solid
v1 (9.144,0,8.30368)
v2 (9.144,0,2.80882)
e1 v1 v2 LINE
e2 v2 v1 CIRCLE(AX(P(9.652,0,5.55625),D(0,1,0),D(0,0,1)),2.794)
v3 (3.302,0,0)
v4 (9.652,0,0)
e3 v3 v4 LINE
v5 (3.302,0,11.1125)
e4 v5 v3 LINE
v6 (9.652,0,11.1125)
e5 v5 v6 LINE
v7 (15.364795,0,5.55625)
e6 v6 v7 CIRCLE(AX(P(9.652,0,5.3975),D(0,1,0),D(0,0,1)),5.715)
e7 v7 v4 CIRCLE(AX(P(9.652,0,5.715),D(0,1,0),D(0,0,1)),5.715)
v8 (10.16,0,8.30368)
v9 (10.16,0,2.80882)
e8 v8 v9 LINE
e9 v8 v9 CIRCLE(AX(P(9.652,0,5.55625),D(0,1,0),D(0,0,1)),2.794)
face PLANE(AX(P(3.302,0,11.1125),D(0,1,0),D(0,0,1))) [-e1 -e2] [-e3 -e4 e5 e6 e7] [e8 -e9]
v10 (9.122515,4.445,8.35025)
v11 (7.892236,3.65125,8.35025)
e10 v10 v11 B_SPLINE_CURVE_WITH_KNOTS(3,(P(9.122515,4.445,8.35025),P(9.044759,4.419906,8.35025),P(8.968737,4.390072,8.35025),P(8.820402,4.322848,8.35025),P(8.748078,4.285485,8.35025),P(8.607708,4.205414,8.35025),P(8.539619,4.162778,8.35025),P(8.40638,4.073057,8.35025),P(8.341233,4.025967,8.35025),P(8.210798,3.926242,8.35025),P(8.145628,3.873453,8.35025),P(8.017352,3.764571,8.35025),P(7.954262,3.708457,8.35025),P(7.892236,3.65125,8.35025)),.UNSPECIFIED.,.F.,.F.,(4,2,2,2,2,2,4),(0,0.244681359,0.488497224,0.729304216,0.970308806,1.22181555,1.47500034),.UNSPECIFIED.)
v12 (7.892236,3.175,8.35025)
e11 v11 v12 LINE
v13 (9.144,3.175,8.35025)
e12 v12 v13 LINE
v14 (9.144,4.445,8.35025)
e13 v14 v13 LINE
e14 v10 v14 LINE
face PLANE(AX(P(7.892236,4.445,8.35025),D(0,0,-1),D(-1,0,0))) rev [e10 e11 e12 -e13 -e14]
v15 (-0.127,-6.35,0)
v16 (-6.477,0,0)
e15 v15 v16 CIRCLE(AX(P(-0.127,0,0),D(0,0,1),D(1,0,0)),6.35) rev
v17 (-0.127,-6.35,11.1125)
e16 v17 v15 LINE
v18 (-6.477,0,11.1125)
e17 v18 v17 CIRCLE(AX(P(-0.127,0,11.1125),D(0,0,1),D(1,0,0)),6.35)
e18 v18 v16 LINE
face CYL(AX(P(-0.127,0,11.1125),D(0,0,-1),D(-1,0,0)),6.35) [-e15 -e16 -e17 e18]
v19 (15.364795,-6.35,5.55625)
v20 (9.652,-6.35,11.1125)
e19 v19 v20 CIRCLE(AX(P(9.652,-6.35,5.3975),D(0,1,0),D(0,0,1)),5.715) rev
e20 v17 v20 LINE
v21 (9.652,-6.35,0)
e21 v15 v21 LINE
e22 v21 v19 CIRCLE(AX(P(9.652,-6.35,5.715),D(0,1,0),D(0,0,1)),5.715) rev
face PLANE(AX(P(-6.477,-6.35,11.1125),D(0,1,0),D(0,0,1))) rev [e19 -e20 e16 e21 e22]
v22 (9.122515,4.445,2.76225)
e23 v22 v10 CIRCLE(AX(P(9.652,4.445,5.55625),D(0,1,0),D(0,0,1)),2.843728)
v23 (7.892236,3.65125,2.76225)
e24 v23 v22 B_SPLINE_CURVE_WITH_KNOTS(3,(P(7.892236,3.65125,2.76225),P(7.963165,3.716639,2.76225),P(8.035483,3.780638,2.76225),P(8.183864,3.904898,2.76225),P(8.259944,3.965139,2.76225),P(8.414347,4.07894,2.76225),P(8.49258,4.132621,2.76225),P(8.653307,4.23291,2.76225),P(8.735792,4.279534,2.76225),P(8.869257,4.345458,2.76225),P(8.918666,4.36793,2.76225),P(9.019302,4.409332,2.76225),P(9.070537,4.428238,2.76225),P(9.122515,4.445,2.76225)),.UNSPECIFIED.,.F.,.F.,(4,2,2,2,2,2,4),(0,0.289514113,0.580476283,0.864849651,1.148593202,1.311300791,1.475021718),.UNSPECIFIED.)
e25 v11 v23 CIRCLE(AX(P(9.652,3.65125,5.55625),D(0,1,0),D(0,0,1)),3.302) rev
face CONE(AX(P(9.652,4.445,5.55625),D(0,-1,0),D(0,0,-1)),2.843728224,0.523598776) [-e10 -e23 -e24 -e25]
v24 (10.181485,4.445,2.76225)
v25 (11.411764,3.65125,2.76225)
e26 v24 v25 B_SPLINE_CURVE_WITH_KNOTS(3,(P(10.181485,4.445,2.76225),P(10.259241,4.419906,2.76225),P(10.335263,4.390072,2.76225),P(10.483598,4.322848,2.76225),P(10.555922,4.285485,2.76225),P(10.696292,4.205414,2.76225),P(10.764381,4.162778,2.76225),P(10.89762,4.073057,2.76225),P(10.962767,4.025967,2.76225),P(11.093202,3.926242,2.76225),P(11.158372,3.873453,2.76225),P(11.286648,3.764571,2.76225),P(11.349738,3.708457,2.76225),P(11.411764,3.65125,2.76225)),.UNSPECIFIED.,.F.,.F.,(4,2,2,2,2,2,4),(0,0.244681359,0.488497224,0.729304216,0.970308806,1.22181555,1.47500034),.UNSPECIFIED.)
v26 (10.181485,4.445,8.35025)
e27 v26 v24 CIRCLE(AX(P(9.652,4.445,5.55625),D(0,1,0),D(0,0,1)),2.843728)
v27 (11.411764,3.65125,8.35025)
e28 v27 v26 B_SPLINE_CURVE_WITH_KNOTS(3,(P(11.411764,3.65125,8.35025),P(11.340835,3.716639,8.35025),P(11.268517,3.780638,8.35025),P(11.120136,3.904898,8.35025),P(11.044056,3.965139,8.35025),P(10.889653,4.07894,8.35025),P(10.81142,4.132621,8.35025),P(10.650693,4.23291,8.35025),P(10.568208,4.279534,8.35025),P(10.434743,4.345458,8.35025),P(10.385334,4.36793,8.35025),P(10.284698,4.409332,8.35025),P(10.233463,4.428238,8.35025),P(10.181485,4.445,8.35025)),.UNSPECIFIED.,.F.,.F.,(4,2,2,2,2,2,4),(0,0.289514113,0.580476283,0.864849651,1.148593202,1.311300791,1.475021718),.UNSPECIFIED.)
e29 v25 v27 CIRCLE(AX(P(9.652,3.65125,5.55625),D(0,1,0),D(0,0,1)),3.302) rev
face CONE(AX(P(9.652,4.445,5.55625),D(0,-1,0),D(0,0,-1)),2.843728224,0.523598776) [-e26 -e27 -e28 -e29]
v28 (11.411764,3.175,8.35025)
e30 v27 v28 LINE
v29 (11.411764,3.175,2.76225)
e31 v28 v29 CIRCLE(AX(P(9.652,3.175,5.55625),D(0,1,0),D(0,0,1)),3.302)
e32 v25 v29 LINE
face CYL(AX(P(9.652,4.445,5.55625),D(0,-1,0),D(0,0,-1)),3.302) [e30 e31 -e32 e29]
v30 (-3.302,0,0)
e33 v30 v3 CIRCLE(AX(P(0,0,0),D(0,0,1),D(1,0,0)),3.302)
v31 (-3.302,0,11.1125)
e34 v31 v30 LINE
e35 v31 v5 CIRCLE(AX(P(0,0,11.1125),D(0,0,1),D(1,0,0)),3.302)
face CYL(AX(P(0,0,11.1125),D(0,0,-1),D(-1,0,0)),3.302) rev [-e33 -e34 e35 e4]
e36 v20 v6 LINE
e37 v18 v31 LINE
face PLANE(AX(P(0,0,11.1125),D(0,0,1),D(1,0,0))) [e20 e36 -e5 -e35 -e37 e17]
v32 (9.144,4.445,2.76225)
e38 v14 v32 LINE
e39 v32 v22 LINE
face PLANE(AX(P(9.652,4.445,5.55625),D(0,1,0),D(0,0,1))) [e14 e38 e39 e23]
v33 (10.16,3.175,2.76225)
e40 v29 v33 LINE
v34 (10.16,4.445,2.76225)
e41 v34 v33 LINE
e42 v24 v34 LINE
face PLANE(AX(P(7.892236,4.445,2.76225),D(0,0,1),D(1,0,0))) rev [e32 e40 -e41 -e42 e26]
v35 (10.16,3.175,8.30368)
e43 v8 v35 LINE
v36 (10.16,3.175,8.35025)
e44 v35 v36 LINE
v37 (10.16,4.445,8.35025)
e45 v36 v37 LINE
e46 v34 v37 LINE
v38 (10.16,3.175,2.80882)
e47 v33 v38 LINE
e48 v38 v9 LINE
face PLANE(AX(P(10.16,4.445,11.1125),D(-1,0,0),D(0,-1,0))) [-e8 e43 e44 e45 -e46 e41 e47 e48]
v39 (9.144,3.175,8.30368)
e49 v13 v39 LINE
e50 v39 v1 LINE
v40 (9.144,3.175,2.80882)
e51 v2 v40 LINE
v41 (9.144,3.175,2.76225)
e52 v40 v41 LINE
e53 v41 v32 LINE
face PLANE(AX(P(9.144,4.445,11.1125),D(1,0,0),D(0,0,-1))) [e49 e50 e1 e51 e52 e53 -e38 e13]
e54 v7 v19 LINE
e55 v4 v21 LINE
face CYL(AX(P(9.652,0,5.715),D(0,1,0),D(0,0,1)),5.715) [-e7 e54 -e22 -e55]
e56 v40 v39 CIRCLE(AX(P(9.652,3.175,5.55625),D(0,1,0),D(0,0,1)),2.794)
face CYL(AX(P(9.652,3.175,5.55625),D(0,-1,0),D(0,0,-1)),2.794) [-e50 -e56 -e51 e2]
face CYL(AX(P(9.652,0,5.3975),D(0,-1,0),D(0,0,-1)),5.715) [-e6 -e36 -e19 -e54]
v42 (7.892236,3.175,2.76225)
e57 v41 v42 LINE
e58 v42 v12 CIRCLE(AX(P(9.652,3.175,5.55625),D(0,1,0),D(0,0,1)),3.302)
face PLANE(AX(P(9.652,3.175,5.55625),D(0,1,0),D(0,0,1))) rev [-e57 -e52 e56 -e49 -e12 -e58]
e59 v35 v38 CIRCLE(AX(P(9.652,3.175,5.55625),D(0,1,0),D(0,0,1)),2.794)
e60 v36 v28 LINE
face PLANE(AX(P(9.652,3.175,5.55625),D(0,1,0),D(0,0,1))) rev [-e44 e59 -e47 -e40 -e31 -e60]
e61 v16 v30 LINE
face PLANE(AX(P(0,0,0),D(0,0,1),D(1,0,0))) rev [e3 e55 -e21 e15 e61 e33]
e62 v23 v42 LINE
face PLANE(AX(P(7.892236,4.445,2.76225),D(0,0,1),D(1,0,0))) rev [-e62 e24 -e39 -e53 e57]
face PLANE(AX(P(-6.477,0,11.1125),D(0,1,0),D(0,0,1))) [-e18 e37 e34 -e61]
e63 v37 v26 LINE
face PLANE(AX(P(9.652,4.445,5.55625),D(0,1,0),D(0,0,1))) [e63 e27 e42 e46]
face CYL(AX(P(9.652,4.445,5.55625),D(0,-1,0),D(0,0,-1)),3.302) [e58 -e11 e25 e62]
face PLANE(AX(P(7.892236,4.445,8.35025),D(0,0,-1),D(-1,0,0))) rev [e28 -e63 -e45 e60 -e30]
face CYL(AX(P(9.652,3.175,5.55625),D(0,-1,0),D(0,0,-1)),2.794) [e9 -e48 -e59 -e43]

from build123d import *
from OCP.BRepFilletAPI import BRepFilletAPI_MakeChamfer

# Parameters (mm, degrees)
BOSS_EXTRUDE1_DEPTH = 11.1125
FILLET1_R           = 6.35
FILLET2_R           = 5.715
SKETCH2_R           = 2.794
BOSS_EXTRUDE2_DEPTH = 3.175
BOSS_EXTRUDE3_DEPTH = 1.27
SKETCH4_W           = 1.016
SKETCH4_H           = 4.445
CUT_EXTRUDE2_DEPTH  = 20.997176622
CHAMFER1_SIZE       = 0.79375
CHAMFER1_SIZE2      = 0.458271776


# Some blends are built 0.0001 mm under size
with BuildPart() as part:
    # Sketch1 → Boss-Extrude1 (new body)
    with BuildSketch(Plane.XY):
        with BuildLine():
            Line((3.302, 0), (15.367, 0))
            Line((15.367, 0), (15.367, -6.35))
            Line((15.367, -6.35), (-6.477, -6.35))
            Line((-6.477, -6.35), (-6.477, 0))
            Line((-6.477, 0), (-3.302, 0))
            ThreePointArc((-3.302, 0), (0, -3.302), (3.302, 0))
        make_face()
    extrude(amount=BOSS_EXTRUDE1_DEPTH)

    # Fillet1
    fillet1_edges = [part.edges().sort_by_distance(p)[0] for p in [
        (-6.477, -6.35, 5.55625),
    ]]
    fillet(fillet1_edges, radius=FILLET1_R - 0.0001)  # a hair under: the kernel refuses the full size

    # Fillet2
    # the kernel refuses this fillet: 5.715 mm, written as the material it takes off along each edge
    with BuildSketch(Plane(origin=(15.367, 14.2875, 0), x_dir=(-1, 0, 0), z_dir=(0, -1, 0)), Plane(origin=(15.367, 14.2875, 11.1125), x_dir=(0, 0, -1), z_dir=(0, -1, 0))) as fillet2_piece_1:
        with BuildLine():
            CenterArc((FILLET2_R, -FILLET2_R), FILLET2_R, 90, 90)
            Line((0, -FILLET2_R), (0, 0))
            Line((0, 0), (FILLET2_R, 0))
        make_face()
    extrude(amount=34.925, mode=Mode.SUBTRACT)

    # Sketch2 → Boss-Extrude2 (add)
    with BuildSketch(Plane(origin=(0, 0, 0), x_dir=(1, 0, 0), z_dir=(0, 1, 0))):
        with Locations(Location((9.652, -5.55625, 0), (0, 0, 270))):
            Circle(SKETCH2_R)
    extrude(amount=BOSS_EXTRUDE2_DEPTH)

    # Sketch3 → Boss-Extrude3 (add)
    with BuildSketch(Plane(origin=(0, 3.175, 0), x_dir=(1, 0, 0), z_dir=(0, 1, 0))):
        with BuildLine():
            Line((7.89223638, -8.35025), (11.41176362, -8.35025))
            ThreePointArc((11.41176362, -8.35025), (12.954, -5.55625), (11.41176362, -2.76225))
            Line((11.41176362, -2.76225), (7.89223638, -2.76225))
            ThreePointArc((7.89223638, -2.76225), (6.35, -5.55625), (7.89223638, -8.35025))
        make_face()
    extrude(amount=BOSS_EXTRUDE3_DEPTH)

    # Sketch4 → Cut-Extrude2 (cut, through all)
    with BuildSketch(Plane.XY):
        with Locations((9.652, 2.2225)):
            Rectangle(SKETCH4_W, SKETCH4_H)
    extrude(amount=CUT_EXTRUDE2_DEPTH, mode=Mode.SUBTRACT)

    # Chamfer1: one chamfer whose edges measure the first distance from different faces: ONE call of the kernel's chamfer builder (chamfer() names one face for all edges)
    chamfer1_edges_1 = [part.edges().sort_by_distance(p)[0] for p in [
        (6.35, 4.445, 5.55625),
    ]]
    chamfer1_side_1 = [part.faces().sort_by_distance(p)[0] for p in [
        (6.35, 3.81, 5.55625),
    ]]
    chamfer1_edges_2 = [part.edges().sort_by_distance(p)[0] for p in [
        (12.954, 4.445, 5.55625),
    ]]
    chamfer1_side_2 = [part.faces().sort_by_distance(p)[0] for p in [
        (12.954, 3.81, 5.55625),
    ]]
    chamfer1 = BRepFilletAPI_MakeChamfer(part.part.solid().wrapped)
    for e in chamfer1_edges_1:
        chamfer1.Add(CHAMFER1_SIZE, CHAMFER1_SIZE2, e.wrapped, chamfer1_side_1[0].wrapped)  # the first distance lies on this face
    for e in chamfer1_edges_2:
        chamfer1.Add(CHAMFER1_SIZE, CHAMFER1_SIZE2, e.wrapped, chamfer1_side_2[0].wrapped)  # the first distance lies on this face
    add(Compound.cast(chamfer1.Shape()), mode=Mode.REPLACE)


solid = part.part
